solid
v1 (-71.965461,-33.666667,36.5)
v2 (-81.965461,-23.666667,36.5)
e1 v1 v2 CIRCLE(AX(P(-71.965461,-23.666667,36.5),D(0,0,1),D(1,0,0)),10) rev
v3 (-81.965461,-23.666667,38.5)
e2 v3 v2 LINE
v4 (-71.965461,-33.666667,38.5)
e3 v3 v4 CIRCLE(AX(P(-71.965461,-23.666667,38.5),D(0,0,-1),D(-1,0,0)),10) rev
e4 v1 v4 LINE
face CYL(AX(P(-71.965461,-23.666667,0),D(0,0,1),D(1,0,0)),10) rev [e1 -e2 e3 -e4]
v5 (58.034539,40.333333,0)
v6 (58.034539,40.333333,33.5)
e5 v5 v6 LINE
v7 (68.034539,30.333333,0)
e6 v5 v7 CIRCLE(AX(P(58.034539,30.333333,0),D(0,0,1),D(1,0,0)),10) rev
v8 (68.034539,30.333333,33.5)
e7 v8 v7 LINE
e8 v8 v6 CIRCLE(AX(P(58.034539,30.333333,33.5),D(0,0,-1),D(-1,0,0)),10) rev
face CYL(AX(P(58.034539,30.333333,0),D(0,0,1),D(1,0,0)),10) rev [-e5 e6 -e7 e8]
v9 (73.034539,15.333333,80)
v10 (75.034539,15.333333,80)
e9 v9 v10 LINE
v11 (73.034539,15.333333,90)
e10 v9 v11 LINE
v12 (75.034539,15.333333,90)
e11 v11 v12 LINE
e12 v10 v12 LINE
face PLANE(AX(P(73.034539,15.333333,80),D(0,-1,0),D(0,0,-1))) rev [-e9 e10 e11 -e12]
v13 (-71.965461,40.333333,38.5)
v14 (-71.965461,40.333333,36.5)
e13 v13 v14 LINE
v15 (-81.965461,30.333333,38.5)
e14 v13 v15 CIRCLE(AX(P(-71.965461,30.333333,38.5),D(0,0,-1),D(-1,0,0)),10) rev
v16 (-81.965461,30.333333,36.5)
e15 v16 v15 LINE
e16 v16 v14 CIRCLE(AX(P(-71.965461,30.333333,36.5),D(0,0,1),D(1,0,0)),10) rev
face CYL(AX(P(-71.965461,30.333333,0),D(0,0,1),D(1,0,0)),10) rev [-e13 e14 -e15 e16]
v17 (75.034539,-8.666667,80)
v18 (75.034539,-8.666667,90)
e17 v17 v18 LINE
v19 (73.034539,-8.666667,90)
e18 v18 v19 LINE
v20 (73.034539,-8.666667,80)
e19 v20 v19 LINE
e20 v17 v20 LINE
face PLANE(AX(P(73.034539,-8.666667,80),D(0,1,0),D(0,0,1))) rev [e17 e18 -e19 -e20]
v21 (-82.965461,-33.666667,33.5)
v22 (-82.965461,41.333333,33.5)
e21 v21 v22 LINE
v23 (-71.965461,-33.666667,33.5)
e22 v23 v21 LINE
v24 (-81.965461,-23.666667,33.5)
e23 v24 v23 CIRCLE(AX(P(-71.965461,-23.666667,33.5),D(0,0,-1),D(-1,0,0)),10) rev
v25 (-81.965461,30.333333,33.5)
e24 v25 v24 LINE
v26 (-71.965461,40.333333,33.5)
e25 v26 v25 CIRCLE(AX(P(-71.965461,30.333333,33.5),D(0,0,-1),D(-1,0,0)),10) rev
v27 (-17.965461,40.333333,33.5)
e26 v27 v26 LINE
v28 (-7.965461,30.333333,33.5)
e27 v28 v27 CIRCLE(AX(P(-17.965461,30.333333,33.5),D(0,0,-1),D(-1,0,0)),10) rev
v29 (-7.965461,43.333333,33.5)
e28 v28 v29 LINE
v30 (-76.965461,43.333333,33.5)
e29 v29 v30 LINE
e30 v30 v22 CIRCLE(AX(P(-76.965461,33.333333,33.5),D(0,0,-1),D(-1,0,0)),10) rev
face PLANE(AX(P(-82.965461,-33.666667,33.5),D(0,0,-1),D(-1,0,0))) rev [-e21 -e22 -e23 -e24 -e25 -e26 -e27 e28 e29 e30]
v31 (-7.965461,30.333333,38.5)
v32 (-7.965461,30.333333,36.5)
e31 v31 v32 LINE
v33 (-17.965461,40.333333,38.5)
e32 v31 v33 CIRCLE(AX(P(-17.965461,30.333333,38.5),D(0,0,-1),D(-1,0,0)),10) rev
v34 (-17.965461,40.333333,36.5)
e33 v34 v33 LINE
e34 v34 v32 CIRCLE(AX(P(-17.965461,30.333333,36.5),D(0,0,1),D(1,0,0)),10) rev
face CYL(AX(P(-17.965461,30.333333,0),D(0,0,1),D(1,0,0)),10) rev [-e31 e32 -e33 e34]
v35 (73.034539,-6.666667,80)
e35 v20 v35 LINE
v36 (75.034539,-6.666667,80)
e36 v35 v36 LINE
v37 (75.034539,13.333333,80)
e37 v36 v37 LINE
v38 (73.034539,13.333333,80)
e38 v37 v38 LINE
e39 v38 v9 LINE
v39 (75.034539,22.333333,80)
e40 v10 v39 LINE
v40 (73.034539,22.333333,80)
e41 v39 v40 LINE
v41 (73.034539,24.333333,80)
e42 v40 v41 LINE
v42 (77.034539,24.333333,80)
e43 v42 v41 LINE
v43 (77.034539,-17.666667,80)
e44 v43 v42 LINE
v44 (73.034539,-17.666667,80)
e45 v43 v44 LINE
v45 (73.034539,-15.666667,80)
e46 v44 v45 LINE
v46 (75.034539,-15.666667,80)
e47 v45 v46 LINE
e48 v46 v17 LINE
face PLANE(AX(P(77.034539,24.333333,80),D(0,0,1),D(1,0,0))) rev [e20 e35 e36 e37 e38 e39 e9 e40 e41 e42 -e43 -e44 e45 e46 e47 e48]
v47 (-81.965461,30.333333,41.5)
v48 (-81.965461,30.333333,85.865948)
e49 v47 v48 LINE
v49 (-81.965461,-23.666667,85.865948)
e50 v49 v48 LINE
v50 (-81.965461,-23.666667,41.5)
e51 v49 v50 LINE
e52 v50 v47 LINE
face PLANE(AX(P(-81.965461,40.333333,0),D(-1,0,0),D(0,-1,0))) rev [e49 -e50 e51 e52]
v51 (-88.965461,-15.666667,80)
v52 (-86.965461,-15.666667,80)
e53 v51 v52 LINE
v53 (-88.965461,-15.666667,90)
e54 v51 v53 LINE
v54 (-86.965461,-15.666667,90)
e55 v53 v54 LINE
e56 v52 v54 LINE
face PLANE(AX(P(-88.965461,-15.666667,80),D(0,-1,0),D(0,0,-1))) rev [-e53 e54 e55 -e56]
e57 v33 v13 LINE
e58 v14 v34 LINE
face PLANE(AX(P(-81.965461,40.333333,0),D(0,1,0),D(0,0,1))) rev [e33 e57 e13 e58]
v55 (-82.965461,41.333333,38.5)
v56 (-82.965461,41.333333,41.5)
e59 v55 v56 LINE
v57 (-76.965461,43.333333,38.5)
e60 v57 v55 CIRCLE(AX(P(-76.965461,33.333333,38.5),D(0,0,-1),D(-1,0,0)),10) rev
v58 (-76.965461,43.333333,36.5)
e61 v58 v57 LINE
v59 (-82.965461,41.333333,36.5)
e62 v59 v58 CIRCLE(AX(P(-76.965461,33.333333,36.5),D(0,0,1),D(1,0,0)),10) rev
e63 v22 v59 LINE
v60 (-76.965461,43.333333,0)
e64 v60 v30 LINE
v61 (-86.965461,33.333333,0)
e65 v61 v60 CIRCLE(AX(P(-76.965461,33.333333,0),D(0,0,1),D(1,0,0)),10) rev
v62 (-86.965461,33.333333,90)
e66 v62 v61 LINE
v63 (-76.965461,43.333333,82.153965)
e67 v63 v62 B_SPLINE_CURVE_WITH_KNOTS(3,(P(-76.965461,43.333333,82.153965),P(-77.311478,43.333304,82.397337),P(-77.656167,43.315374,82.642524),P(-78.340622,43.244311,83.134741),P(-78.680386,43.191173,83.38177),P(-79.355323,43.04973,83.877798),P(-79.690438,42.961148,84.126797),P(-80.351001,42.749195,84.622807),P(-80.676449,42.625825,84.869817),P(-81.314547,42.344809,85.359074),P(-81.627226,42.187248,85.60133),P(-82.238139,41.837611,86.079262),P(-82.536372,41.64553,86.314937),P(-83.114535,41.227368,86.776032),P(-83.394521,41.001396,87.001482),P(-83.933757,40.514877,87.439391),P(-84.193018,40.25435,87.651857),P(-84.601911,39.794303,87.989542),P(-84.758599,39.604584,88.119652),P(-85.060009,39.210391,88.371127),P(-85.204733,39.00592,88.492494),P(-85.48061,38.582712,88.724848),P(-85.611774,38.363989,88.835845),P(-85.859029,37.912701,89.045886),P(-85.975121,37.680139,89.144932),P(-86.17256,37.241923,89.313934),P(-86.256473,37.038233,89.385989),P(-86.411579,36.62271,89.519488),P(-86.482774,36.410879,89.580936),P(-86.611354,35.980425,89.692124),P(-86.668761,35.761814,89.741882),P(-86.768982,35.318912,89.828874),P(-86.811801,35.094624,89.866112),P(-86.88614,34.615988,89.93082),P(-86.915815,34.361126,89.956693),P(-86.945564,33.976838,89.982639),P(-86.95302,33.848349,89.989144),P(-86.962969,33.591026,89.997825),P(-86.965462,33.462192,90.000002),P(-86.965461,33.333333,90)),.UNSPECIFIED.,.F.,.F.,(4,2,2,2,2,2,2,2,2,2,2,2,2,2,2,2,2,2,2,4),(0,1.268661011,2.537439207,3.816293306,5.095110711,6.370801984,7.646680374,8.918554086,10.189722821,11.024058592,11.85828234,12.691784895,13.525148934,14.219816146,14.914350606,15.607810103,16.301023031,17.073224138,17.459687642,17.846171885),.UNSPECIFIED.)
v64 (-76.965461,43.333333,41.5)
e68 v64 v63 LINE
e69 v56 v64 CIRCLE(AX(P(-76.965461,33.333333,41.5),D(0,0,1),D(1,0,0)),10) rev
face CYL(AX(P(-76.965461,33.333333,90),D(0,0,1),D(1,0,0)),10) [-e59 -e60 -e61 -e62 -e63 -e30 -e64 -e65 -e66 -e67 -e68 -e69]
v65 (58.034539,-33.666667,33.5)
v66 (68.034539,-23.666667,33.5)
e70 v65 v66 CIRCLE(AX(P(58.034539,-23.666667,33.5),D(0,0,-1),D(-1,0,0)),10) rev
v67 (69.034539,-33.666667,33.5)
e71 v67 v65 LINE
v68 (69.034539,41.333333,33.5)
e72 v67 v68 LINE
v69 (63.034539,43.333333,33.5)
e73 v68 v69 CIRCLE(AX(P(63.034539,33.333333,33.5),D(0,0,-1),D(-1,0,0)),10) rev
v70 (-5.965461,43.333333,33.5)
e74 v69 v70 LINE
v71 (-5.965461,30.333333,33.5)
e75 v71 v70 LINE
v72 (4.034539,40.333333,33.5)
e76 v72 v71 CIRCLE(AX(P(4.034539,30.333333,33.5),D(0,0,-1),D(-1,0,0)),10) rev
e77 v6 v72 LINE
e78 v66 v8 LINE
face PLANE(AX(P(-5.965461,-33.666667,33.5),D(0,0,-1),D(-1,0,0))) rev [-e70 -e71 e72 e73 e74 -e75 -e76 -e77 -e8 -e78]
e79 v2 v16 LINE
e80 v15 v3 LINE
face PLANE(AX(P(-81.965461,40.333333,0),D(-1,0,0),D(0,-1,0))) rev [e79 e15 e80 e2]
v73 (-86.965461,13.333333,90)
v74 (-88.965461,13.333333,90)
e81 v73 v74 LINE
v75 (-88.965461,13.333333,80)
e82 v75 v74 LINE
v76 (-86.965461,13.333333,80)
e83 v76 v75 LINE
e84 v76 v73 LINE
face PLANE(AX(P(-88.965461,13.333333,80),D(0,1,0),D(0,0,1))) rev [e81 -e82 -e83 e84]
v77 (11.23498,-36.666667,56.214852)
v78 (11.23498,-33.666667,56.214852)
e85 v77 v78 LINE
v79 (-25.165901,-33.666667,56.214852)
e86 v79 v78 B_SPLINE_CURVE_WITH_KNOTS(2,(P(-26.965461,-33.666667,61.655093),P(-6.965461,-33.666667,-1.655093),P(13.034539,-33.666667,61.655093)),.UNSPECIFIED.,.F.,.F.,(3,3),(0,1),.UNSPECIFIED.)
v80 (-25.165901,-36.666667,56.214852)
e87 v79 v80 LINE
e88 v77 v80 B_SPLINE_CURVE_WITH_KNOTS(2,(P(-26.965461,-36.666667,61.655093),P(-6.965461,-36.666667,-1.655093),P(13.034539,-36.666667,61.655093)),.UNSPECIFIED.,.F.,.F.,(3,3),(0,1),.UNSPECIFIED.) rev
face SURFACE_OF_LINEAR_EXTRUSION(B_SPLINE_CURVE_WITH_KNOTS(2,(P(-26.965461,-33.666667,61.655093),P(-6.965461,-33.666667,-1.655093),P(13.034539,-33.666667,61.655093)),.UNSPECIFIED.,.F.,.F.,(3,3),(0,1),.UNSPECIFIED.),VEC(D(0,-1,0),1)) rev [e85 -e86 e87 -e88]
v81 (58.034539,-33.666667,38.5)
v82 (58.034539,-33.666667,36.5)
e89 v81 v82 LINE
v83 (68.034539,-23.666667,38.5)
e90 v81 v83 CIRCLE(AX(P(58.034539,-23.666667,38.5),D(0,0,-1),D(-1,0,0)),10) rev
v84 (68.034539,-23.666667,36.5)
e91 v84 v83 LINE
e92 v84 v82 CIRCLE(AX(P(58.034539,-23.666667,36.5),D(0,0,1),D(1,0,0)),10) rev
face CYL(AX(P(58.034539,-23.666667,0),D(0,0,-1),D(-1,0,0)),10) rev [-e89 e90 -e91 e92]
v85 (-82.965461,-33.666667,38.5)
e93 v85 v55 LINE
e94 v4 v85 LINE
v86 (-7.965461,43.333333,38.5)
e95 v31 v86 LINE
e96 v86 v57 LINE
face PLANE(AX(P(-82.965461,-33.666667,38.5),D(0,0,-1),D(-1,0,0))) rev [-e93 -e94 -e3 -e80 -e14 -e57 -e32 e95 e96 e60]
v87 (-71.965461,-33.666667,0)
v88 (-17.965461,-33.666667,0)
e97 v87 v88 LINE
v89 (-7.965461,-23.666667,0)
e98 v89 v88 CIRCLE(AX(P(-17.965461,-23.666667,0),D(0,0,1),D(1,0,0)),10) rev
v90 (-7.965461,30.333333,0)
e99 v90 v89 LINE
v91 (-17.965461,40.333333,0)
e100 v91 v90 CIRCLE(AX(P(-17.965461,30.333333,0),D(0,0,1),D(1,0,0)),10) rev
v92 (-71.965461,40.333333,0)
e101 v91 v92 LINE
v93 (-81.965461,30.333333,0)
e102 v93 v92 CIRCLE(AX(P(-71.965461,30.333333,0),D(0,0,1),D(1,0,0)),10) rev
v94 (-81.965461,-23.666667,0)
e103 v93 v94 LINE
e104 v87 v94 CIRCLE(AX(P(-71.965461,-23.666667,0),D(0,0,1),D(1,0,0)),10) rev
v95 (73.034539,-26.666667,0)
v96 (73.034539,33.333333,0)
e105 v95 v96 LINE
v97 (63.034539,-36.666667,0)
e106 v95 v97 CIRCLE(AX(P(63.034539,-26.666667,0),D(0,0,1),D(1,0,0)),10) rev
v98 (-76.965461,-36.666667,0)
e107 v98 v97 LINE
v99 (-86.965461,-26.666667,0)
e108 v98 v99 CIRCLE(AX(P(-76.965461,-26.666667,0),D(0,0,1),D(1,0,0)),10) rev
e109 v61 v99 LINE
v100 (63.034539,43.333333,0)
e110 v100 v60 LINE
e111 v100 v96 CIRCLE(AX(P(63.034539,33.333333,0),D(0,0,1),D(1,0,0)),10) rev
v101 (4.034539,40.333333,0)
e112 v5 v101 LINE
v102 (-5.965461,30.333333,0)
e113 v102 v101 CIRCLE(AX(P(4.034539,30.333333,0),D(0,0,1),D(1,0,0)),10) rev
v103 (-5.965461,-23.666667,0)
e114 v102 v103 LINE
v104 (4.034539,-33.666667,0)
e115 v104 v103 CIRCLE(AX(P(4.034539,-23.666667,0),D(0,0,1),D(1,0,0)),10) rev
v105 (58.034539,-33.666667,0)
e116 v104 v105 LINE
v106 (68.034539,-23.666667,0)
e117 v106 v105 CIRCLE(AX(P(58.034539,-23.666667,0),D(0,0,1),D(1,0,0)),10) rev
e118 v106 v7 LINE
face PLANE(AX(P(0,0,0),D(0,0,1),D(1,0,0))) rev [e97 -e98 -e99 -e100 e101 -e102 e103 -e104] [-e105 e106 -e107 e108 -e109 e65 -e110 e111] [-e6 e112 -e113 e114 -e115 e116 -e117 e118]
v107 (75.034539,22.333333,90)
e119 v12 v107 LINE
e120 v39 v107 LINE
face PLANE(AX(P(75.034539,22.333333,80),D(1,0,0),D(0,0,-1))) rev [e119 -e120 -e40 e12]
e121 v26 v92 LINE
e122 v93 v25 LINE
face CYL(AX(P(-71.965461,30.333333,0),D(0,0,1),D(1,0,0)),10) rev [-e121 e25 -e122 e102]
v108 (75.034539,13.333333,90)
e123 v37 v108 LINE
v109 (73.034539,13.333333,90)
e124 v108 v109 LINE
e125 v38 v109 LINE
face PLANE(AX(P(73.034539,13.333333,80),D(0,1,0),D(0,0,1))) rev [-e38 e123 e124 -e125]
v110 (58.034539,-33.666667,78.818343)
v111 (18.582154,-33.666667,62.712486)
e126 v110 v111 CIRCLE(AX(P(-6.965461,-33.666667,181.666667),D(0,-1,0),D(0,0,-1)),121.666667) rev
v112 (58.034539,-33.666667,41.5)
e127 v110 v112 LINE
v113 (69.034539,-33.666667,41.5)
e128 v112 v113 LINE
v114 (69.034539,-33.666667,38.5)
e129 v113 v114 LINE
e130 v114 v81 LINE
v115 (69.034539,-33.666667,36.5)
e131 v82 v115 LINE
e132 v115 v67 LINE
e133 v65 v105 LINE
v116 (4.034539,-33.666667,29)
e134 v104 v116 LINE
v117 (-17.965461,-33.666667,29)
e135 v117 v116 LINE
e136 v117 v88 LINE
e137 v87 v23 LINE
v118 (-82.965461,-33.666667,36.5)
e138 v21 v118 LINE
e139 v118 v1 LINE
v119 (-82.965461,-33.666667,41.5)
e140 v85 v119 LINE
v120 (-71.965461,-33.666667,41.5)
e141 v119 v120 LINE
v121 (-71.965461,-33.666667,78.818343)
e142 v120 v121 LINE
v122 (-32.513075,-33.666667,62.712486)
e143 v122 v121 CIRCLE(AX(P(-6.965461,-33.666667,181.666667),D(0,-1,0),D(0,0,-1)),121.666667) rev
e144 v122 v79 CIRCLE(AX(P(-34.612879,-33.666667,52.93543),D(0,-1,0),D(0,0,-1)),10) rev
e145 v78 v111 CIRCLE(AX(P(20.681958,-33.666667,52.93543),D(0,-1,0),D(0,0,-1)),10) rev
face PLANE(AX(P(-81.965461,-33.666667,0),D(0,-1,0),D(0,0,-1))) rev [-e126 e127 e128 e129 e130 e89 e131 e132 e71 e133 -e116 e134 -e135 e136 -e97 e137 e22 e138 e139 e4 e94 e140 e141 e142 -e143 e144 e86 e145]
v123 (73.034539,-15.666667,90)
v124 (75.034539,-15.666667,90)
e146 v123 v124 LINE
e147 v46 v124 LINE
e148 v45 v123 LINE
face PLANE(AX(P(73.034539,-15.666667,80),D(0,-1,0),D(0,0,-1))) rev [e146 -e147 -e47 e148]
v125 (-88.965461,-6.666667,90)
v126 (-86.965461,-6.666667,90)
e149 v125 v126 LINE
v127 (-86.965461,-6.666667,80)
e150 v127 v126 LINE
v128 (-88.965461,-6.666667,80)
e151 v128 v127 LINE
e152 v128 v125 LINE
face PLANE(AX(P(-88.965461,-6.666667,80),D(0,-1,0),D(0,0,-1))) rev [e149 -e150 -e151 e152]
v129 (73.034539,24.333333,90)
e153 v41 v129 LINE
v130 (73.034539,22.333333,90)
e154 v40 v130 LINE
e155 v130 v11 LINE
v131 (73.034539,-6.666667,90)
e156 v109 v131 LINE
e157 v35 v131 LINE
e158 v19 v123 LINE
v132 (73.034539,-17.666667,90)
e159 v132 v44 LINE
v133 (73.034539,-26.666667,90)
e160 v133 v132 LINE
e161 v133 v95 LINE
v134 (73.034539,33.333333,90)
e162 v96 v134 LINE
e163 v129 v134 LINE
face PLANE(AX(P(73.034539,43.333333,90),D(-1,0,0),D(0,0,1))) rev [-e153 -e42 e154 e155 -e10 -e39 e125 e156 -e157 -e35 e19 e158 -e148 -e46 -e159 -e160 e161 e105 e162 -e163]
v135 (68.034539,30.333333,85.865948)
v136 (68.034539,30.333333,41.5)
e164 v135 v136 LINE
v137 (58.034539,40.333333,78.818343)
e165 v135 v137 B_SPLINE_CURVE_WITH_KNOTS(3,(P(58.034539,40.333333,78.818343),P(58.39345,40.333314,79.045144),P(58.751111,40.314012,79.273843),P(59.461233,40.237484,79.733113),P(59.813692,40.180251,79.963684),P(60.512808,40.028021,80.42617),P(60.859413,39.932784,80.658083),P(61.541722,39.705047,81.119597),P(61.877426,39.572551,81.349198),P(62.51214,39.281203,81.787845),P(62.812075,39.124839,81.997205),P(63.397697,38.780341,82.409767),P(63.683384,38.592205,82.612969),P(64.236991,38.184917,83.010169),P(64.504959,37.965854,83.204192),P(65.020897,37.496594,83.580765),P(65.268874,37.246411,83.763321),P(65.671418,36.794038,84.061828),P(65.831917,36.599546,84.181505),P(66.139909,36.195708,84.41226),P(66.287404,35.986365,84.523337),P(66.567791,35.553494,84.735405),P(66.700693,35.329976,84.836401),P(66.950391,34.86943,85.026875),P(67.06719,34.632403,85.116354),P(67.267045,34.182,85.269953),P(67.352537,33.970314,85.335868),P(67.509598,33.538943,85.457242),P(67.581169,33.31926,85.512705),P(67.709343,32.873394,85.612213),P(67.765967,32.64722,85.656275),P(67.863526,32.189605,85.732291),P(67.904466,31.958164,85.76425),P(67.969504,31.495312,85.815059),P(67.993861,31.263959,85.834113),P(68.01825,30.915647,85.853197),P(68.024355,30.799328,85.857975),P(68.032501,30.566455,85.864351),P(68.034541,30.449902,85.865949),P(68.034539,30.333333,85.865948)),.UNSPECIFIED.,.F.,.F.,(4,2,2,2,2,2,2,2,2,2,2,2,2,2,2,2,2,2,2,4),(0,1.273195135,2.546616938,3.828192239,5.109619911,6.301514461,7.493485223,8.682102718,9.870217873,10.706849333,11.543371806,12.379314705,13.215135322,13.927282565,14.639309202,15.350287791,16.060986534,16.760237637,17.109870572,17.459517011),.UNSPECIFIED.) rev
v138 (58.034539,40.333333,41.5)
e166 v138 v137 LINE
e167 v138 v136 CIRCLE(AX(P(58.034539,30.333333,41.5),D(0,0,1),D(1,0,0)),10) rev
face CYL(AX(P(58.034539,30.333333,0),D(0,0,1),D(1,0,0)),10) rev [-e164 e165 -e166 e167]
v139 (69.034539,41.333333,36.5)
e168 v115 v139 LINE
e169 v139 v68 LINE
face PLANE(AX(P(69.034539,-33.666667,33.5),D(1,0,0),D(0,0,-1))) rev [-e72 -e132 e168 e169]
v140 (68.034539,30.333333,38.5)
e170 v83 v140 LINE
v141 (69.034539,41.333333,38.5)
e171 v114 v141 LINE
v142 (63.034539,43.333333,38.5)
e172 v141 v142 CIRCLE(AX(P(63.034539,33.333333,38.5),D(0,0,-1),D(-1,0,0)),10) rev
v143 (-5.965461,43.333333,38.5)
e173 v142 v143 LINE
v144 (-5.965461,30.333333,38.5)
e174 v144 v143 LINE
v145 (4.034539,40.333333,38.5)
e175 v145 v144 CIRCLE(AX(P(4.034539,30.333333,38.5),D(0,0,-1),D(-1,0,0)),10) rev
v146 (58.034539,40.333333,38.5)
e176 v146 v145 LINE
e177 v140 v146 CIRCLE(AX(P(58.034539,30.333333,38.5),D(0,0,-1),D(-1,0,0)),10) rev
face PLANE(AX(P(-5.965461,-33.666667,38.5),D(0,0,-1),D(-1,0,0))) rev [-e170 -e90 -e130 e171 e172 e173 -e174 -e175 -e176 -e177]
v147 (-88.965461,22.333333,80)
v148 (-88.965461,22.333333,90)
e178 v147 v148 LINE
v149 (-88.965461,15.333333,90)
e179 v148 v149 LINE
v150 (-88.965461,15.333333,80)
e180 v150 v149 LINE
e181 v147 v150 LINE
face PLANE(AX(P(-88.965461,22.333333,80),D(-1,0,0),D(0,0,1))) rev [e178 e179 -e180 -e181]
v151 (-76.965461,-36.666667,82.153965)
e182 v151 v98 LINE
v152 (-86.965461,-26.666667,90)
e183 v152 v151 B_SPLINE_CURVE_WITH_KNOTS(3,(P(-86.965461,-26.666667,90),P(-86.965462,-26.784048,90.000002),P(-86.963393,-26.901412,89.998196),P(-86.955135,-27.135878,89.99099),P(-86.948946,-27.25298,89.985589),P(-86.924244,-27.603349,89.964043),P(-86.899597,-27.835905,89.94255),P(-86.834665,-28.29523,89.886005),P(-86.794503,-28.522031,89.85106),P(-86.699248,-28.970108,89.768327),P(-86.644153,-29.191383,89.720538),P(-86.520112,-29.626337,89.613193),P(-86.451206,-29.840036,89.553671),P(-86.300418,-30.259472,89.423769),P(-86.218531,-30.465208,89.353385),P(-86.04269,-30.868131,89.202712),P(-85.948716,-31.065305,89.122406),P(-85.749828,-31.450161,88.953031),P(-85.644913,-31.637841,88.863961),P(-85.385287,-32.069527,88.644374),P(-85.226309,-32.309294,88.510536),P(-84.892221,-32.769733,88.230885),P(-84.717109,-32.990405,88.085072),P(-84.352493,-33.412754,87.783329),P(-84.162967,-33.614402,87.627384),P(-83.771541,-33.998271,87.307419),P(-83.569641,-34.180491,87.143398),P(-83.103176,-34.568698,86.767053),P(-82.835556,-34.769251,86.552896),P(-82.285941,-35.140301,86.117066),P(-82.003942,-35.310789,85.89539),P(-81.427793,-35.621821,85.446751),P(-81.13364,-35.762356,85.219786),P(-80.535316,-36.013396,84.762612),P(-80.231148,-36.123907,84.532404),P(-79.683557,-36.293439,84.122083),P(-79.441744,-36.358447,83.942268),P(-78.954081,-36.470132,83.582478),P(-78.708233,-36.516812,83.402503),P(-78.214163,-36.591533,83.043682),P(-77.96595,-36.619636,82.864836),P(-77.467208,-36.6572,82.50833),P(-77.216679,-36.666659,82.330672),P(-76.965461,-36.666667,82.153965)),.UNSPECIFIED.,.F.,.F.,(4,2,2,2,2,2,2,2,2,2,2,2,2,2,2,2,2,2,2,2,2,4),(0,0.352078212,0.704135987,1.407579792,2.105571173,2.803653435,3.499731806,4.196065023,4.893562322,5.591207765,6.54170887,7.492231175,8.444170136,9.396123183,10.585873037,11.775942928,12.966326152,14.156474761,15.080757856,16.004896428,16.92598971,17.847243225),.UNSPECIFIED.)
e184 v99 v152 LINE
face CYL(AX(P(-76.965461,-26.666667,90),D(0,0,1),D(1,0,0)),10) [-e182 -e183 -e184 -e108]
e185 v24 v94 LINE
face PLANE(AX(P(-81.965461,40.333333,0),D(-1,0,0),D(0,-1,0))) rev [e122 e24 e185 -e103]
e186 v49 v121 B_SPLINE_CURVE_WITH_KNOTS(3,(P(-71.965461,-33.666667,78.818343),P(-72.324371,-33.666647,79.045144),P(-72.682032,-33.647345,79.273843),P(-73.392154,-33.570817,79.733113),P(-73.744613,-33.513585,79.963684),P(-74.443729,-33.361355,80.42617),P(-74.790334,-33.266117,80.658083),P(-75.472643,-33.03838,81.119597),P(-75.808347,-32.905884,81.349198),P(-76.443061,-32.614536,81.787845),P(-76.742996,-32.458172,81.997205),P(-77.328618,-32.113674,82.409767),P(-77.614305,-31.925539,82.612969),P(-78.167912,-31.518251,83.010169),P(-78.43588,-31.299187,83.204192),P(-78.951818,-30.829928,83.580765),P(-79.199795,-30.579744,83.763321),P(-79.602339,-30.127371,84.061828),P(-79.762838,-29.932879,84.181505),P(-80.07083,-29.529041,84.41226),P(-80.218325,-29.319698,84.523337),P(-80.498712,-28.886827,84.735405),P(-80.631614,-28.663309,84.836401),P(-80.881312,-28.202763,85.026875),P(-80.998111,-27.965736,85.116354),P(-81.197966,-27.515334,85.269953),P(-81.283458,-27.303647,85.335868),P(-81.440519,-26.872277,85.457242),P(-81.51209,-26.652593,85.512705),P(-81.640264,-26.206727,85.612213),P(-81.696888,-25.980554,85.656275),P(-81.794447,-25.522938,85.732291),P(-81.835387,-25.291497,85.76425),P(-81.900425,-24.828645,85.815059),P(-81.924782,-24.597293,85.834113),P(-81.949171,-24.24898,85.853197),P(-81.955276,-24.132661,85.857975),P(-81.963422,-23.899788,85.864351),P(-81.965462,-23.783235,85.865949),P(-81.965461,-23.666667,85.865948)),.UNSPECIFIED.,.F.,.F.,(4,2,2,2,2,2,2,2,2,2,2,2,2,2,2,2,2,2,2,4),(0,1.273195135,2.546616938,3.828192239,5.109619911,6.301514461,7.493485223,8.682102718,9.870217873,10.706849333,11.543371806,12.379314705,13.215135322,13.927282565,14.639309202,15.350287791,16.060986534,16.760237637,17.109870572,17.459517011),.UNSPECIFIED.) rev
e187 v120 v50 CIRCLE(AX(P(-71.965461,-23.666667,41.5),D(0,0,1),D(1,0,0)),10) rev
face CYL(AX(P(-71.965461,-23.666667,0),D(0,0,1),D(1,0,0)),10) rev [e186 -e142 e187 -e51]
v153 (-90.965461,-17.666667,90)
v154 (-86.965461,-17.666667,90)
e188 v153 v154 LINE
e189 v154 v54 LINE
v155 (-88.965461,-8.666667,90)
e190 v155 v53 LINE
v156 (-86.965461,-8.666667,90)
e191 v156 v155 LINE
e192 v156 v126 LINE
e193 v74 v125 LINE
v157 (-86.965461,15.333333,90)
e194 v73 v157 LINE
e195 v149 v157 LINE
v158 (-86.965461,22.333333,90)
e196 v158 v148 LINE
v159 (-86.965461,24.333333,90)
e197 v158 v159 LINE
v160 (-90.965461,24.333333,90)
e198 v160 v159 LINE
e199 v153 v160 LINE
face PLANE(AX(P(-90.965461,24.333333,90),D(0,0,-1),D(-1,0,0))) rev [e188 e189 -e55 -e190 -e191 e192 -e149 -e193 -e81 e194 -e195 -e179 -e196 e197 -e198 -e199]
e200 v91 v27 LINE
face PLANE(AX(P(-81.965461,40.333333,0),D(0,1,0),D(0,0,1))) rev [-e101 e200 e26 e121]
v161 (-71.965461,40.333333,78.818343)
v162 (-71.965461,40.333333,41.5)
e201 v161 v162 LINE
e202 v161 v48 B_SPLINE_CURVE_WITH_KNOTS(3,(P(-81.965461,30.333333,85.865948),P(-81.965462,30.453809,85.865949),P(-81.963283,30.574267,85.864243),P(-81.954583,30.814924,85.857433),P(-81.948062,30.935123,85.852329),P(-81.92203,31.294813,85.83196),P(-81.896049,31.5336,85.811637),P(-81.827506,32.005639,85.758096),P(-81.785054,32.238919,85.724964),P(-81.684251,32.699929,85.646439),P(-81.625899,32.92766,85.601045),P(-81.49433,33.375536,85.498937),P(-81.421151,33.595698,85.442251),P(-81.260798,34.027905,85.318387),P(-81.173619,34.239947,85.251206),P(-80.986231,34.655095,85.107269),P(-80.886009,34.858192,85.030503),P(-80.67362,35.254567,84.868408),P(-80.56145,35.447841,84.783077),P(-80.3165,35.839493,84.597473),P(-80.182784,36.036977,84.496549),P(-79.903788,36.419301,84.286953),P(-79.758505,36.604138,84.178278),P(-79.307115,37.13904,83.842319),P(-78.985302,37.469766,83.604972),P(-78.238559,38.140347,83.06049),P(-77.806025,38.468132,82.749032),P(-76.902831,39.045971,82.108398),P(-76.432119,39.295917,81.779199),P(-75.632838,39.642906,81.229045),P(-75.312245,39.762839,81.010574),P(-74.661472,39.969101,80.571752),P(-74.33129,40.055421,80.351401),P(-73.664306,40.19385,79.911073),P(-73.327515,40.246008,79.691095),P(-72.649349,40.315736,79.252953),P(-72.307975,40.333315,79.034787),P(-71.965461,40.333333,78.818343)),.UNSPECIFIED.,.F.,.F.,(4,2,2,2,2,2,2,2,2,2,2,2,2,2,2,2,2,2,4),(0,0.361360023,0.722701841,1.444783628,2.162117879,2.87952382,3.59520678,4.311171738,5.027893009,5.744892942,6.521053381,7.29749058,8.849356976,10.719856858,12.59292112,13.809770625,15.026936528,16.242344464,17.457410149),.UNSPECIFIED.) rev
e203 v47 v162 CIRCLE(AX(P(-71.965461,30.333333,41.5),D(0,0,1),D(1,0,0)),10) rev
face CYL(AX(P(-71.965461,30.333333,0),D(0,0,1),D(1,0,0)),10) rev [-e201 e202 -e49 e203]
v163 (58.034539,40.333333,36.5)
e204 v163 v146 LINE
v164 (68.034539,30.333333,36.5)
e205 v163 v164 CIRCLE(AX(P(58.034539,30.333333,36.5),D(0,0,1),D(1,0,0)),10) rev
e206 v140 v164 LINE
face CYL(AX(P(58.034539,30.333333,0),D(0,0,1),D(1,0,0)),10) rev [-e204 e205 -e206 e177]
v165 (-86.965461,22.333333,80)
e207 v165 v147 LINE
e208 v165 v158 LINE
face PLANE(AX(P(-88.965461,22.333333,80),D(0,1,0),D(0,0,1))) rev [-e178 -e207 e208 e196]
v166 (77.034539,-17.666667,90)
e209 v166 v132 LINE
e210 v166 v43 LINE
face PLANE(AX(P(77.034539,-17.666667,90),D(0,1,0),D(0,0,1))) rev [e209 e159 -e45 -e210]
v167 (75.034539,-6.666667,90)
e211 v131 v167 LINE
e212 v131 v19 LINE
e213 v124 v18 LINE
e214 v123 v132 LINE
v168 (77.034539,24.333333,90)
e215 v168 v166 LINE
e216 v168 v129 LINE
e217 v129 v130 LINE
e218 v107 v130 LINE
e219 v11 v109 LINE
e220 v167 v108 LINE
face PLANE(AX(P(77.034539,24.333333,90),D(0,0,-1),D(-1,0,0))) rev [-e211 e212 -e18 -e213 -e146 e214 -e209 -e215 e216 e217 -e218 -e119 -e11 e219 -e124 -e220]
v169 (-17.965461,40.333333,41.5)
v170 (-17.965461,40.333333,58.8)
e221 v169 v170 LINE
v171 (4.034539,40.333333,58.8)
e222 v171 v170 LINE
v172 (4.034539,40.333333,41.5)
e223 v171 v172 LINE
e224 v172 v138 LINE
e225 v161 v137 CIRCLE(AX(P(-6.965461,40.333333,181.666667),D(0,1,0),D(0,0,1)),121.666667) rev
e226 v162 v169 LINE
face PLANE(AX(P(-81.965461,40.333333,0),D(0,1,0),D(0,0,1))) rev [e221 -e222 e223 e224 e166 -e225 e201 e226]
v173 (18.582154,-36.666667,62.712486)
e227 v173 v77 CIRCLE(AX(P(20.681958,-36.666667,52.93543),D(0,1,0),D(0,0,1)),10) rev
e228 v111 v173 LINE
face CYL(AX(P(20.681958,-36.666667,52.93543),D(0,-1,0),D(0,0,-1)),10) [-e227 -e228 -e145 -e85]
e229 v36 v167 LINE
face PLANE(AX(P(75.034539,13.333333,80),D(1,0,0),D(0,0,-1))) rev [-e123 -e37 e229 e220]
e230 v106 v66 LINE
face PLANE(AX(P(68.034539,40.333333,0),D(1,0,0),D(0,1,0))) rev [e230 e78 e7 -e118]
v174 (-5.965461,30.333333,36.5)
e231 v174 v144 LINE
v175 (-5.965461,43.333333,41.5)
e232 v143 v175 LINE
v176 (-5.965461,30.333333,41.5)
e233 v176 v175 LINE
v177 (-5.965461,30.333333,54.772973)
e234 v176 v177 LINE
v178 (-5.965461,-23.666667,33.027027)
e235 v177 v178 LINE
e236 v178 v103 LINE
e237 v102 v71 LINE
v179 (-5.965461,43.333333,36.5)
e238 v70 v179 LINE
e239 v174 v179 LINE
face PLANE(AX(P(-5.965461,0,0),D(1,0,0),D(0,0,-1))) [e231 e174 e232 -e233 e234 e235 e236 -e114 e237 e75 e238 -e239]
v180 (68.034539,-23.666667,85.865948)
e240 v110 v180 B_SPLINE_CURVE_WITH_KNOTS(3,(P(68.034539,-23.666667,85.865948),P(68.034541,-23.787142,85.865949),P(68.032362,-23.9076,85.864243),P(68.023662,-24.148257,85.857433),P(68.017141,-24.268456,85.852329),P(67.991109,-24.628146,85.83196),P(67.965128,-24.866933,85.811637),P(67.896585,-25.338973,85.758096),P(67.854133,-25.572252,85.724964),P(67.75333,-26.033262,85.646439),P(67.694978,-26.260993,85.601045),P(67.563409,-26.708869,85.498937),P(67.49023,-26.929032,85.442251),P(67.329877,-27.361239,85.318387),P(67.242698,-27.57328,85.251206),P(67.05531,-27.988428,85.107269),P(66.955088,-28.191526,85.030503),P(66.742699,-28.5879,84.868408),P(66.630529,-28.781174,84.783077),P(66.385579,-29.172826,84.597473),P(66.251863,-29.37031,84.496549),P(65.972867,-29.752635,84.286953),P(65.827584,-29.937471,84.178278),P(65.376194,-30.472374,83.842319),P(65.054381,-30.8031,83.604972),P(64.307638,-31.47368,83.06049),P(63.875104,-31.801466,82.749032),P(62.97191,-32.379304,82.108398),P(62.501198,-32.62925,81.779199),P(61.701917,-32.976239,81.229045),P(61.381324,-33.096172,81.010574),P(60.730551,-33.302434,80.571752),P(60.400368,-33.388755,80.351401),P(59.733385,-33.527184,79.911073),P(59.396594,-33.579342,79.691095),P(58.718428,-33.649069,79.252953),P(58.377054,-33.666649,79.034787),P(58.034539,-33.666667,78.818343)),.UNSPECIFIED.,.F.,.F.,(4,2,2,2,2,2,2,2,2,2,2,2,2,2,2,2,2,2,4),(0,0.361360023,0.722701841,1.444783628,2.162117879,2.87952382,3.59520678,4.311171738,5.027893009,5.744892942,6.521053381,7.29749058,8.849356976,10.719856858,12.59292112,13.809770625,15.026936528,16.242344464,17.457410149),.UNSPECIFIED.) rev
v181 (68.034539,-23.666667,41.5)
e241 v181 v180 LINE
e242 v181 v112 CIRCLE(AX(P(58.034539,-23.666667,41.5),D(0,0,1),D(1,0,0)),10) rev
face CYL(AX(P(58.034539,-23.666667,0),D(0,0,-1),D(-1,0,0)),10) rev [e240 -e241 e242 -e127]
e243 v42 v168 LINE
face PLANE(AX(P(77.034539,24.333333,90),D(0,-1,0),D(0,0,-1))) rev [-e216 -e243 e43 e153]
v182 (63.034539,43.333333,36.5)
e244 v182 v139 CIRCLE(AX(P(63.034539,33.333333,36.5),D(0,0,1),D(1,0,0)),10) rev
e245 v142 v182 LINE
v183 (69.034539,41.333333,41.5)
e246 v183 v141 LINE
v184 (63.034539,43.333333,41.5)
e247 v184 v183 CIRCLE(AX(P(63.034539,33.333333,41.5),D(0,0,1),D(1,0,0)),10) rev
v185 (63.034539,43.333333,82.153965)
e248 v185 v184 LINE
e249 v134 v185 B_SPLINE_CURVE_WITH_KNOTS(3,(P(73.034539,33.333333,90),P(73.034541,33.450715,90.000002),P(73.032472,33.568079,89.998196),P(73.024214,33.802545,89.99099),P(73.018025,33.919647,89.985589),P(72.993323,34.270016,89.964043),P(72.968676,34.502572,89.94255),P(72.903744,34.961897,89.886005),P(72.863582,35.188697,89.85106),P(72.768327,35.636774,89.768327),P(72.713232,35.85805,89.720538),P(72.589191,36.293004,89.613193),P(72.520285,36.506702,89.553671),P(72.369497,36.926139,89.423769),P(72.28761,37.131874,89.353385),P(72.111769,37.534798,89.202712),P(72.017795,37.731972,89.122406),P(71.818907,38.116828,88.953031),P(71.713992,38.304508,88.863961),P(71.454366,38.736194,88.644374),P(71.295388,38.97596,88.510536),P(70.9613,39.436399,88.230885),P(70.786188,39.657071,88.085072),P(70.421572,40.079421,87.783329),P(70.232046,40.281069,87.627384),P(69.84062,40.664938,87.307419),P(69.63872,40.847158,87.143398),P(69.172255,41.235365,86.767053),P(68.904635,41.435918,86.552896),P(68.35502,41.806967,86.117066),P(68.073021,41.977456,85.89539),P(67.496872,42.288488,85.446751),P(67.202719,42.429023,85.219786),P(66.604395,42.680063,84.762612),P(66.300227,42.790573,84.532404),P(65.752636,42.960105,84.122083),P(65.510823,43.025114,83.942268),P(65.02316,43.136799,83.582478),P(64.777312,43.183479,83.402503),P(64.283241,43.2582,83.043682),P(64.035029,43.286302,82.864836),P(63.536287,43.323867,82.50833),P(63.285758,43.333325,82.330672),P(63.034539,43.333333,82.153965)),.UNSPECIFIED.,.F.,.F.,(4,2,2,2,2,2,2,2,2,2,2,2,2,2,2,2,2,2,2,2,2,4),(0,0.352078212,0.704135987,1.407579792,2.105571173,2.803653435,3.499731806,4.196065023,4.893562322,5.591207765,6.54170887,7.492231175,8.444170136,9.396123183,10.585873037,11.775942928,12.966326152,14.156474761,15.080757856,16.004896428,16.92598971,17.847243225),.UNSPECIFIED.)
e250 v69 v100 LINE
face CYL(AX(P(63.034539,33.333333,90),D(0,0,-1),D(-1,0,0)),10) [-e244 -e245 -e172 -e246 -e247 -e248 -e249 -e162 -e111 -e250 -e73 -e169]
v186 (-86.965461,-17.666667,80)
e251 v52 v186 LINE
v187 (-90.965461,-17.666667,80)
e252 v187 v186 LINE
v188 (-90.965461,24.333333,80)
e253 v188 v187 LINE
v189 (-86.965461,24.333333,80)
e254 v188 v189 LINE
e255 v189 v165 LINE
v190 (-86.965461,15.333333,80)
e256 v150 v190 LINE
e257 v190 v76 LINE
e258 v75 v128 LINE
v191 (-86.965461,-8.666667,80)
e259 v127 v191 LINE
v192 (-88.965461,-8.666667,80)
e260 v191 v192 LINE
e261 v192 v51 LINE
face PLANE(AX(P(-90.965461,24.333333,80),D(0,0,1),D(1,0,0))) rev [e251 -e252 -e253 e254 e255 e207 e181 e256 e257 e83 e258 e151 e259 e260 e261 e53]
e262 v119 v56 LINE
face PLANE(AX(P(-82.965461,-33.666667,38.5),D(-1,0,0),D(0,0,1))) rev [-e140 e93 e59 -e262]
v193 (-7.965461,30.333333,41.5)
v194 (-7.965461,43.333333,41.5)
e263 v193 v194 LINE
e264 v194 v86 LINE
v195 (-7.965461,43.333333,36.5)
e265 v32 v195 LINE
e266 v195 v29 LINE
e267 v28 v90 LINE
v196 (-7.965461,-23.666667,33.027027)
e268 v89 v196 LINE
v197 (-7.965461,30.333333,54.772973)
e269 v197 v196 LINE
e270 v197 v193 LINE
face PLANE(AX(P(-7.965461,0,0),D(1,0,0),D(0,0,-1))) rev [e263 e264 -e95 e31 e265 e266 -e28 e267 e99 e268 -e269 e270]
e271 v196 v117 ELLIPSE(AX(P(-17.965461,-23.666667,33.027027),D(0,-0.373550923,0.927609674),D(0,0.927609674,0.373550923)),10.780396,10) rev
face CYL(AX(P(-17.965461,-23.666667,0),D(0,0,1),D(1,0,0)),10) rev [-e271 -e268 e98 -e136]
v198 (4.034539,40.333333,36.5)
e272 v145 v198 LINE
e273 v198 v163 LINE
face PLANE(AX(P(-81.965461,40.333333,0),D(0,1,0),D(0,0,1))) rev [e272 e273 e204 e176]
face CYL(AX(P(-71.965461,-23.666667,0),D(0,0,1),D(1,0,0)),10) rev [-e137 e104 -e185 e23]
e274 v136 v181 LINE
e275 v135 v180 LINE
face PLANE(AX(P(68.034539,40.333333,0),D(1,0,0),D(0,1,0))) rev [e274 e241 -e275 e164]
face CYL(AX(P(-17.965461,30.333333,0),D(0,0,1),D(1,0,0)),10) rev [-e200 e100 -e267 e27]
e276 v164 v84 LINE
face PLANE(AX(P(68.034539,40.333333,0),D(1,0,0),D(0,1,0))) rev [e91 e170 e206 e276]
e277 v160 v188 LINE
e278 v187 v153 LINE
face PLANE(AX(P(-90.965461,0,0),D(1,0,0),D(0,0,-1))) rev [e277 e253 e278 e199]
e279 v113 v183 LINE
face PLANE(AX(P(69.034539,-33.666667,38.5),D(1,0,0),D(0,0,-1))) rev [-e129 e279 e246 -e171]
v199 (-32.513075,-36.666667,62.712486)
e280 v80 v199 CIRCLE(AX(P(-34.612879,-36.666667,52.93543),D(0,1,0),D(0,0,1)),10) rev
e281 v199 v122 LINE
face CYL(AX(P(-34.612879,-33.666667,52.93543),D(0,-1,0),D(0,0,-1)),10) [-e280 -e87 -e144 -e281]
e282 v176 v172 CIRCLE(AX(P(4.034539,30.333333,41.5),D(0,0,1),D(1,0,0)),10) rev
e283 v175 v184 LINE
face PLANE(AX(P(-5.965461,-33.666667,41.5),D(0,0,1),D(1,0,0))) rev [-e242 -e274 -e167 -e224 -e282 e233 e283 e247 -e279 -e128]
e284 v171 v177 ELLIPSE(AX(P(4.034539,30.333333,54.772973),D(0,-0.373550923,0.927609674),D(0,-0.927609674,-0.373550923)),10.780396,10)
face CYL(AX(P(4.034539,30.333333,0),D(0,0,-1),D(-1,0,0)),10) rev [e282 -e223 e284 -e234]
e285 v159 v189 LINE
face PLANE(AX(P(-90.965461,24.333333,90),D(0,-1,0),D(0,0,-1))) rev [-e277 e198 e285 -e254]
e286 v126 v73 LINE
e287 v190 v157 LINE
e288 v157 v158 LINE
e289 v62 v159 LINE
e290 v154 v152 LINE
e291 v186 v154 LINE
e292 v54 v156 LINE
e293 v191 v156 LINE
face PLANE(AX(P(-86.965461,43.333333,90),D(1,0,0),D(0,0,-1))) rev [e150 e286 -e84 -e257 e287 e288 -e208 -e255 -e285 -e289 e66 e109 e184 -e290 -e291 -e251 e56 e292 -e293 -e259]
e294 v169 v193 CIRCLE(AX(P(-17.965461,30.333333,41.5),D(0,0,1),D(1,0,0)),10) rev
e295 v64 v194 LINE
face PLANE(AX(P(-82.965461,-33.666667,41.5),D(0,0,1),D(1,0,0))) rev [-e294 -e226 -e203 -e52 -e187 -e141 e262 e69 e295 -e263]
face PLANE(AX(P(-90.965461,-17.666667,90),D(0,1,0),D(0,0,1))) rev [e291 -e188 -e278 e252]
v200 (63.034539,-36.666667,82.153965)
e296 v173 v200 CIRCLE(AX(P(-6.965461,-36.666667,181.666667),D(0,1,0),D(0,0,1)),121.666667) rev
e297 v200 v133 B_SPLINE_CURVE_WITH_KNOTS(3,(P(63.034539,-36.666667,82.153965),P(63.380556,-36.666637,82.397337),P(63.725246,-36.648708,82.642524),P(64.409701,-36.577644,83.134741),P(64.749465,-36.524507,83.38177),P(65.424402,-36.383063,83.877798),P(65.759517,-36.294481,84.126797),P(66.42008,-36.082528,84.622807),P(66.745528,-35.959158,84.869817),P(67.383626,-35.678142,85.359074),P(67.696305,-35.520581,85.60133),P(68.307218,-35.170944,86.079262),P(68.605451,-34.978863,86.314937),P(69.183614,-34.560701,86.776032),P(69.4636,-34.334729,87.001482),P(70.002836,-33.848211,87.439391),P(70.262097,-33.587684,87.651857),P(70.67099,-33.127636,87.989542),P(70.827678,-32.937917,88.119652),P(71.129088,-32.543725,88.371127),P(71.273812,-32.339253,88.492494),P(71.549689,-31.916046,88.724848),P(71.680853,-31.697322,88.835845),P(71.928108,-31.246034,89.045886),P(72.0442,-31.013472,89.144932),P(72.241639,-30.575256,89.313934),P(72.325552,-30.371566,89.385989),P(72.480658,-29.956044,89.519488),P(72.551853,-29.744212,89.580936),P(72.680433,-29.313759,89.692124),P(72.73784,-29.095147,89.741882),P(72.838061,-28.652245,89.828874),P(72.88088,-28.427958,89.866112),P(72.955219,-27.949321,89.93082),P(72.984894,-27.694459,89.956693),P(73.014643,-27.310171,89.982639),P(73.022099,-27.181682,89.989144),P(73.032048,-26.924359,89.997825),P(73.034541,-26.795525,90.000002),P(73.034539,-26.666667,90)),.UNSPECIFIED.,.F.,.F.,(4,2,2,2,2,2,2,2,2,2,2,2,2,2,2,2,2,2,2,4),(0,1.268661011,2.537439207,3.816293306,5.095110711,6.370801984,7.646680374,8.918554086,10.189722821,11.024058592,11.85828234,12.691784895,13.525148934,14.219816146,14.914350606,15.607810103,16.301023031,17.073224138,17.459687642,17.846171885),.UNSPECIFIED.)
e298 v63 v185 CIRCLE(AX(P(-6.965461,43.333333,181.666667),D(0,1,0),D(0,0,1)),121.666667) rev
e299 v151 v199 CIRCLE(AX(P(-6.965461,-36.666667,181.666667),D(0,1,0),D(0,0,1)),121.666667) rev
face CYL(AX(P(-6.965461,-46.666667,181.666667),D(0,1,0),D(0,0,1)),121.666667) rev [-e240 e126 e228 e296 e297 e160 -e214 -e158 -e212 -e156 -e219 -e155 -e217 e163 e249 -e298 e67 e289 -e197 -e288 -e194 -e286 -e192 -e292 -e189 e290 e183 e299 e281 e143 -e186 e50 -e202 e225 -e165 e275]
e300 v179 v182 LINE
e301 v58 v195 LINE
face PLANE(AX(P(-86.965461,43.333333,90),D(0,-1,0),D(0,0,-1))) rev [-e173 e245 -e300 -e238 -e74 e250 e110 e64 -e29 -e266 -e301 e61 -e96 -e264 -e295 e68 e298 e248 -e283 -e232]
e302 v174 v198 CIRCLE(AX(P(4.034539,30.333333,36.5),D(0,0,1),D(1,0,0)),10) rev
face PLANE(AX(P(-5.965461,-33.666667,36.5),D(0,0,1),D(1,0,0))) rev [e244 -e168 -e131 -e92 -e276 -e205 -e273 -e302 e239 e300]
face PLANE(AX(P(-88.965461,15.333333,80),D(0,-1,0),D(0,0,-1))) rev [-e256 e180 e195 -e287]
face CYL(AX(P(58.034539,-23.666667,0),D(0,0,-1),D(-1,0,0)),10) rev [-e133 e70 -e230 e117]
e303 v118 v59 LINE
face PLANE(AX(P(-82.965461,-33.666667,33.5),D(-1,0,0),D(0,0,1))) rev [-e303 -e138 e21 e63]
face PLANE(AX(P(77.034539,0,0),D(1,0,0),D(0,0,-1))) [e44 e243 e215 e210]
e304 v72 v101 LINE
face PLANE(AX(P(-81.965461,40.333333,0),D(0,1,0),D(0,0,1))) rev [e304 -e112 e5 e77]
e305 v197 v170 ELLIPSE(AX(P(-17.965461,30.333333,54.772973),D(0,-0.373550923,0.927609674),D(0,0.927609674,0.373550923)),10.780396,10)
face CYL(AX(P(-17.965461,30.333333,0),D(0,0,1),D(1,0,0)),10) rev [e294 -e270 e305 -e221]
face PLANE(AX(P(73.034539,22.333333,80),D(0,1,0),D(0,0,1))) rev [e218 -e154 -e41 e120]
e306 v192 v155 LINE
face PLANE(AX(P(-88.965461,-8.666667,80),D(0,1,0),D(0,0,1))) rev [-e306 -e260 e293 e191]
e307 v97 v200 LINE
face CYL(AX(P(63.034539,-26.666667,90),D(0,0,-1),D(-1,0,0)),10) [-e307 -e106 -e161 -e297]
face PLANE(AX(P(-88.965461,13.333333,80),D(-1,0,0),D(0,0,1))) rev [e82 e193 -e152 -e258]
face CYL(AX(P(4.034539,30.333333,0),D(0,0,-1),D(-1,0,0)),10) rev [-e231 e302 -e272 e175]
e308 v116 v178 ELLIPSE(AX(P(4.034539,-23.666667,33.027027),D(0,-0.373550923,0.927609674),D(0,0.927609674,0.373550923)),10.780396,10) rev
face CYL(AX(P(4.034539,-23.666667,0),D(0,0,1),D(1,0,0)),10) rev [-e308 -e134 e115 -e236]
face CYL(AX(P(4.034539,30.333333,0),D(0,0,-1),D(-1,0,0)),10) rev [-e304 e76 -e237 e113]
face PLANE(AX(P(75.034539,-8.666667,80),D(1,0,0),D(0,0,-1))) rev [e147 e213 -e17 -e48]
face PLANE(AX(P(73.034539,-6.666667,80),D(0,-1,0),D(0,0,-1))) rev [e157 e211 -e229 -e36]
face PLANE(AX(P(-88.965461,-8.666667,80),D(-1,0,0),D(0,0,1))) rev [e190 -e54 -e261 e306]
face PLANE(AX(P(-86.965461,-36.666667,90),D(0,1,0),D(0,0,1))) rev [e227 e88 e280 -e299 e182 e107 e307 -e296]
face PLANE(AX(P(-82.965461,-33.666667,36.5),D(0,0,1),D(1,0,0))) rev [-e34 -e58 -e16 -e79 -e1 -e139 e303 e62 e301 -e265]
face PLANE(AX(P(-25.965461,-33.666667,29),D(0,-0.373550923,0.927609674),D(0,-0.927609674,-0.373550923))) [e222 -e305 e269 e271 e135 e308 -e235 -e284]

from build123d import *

# Parameters (mm, degrees)
ESBO_O1_W                  = 160
ESBO_O1_H                  = 80
RESSALTO_EXTRUS_O1_DEPTH   = 90
ESBO_O2_W                  = 150
ESBO_O2_H                  = 74
CORTE_EXTRUS_O1_DEPTH      = 90
CORTE_EXTRUS_O2_DEPTH      = 90
CORTE_EXTRUS_O3_START      = -3
CORTE_EXTRUS_O3_DEPTH      = 152.536161673
FILETE1_R                  = 10
FILETE2_R                  = 10
RESSALTO_EXTRUS_O3_DEPTH   = 2
ESBO_O14_W                 = 40
ESBO_O14_H                 = 30
RESSALTO_EXTRUS_O10_DEPTH  = 2
FILETE15_R                 = 10
FILETE16_R                 = 10
CORTE_EXTRUS_O8_DEPTH      = 20
CORTE_EXTRUS_O8_DEPTH_BACK = 20
FILETE17_R                 = 10
FILETE18_R                 = 10
FILETE19_R                 = 10
FILETE20_R                 = 10
FILETE21_R                 = 10
FILETE22_R                 = 10
ESBO_O8_W                  = 75
ESBO_O8_H                  = 3
CORTE_EXTRUS_O9_DEPTH      = 77
FILETE24_R                 = 10
FILETE25_R                 = 10
FILETE26_R                 = 10
FILETE27_R                 = 10
ESBO_O9_W                  = 10
ESBO_O9_H                  = 42
RESSALTO_EXTRUS_O11_DEPTH  = 4
ESBO_O17_W                 = 2
ESBO_O17_H                 = 7
ESBO_O17_H_2               = 20
CORTE_EXTRUS_O10_DEPTH     = 10
ESBO_O18_W                 = 10
ESBO_O18_H                 = 42
RESSALTO_EXTRUS_O12_DEPTH  = 4
ESBO_O19_W                 = 2
ESBO_O19_H                 = 7
ESBO_O19_H_2               = 20
CORTE_EXTRUS_O11_DEPTH     = 10


with BuildPart() as part:
    # Esboço1 → Ressalto-extrusão1 (new body)
    with BuildSketch(Plane.XY):
        with Locations((-6.965460526, 3.333333333)):
            Rectangle(ESBO_O1_W, ESBO_O1_H)
    extrude(amount=RESSALTO_EXTRUS_O1_DEPTH)

    # Esboço2 → Corte-extrusão1 (cut)
    with BuildSketch(Plane.XY.offset(90)):
        with Locations((-6.965460526, 3.333333333)):
            Rectangle(ESBO_O2_W, ESBO_O2_H)
    extrude(amount=-CORTE_EXTRUS_O1_DEPTH, mode=Mode.SUBTRACT)

    # Esboço3 → Corte-extrusão2 (cut)
    with BuildSketch(Plane(origin=(0, 43.333333333, 0), x_dir=(1, 0, 0), z_dir=(0, 1, 0))):
        with BuildLine():
            ThreePointArc((-6.965460526, -60), (-49.685479253, -67.746616729), (-86.965460526, -90))
            Line((-86.965460526, -90), (-6.965460526, -90))
            Line((-6.965460526, -90), (-6.965460526, -60))
        make_face()
        with BuildLine():
            Line((-6.965460526, -60), (-6.965460526, -90))
            Line((-6.965460526, -90), (73.034539474, -90))
            ThreePointArc((73.034539474, -90), (35.7545582, -67.746616729), (-6.965460526, -60))
        make_face()
    extrude(amount=-CORTE_EXTRUS_O2_DEPTH, mode=Mode.SUBTRACT)

    # Esboço5 → Corte-extrusão3 (cut, through all)
    with BuildSketch(Plane.XZ.offset(36.666666667).offset(CORTE_EXTRUS_O3_START)):
        with BuildLine():
            ThreePointArc((13.034539474, 61.655093151), (-6.965460526, 60), (-26.965460526, 61.655093151))
            add(Edge.make_bspline(
                [(-26.965460526, 61.655093151), (-6.965460526, -1.655093151), (13.034539474, 61.655093151)],
                knots=[0, 0, 0, 1, 1, 1], degree=2))
        make_face()
    extrude(amount=CORTE_EXTRUS_O3_DEPTH, mode=Mode.SUBTRACT)

    # Filete1
    filete1_edges = [part.edges().sort_by_distance(p)[0] for p in [
        (-26.965460526, -35.166666667, 61.655093151),
    ]]
    fillet(filete1_edges, radius=FILETE1_R)

    # Filete2
    filete2_edges = [part.edges().sort_by_distance(p)[0] for p in [
        (13.034539474, -35.166666667, 61.655093151),
    ]]
    fillet(filete2_edges, radius=FILETE2_R)

    # Esboço7 → Ressalto-extrusão3 (add)
    with BuildSketch(Plane.ZY.offset(5.965460526)):
        Polygon((60, 43.333333333), (0, 43.333333333), (0, -36.666666667), (28, -36.666666667), align=None)
    extrude(amount=RESSALTO_EXTRUS_O3_DEPTH)

    # Esboço14 → Ressalto-extrusão10 (add)
    with BuildSketch(Plane.ZY.offset(5.965460526)):
        with Locations((20, -18.666666667)):
            Rectangle(ESBO_O14_W, ESBO_O14_H)
    extrude(amount=RESSALTO_EXTRUS_O10_DEPTH)

    # Filete15
    # the kernel refuses this fillet: 10 mm, written as the material it adds along each edge
    with BuildSketch(Plane(origin=(-5.965460526, -33.666666667, 0), x_dir=(0, 1, 0), z_dir=(0, 0, 1))) as filete15_piece_1_section:
        with BuildLine():
            CenterArc((FILETE15_R, -FILETE15_R), FILETE15_R, 90, 90)
            Line((0, -FILETE15_R), (0, 0))
            Line((0, 0), (FILETE15_R, 0))
        make_face()
    filete15_piece_1 = extrude(amount=55.079137733, mode=Mode.PRIVATE)
    filete15_piece_1 = split(filete15_piece_1, bisect_by=Plane(origin=(-3.65687296, -31.473045743, 40), z_dir=(0, 0, -1)), keep=Keep.TOP, mode=Mode.PRIVATE)
    add(filete15_piece_1)

    # Filete16
    # the kernel refuses this fillet: 10 mm, written as the material it adds along each edge
    with BuildSketch(Plane(origin=(-7.965460526, -33.666666667, 55.079137733), x_dir=(-1, 0, 0), z_dir=(0, 0, -1))) as filete16_piece_1_section:
        with BuildLine():
            CenterArc((FILETE16_R, FILETE16_R), FILETE16_R, 180, 90)
            Line((0, FILETE16_R), (0, 0))
            Line((0, 0), (FILETE16_R, 0))
        make_face()
    filete16_piece_1 = extrude(amount=55.079137733, mode=Mode.PRIVATE)
    filete16_piece_1 = split(filete16_piece_1, bisect_by=Plane(origin=(-9.937156606, -31.292891496, 40), z_dir=(0, 0, -1)), keep=Keep.TOP, mode=Mode.PRIVATE)
    add(filete16_piece_1)

    # Esboço16 → Corte-extrusão8 (cut, two sides: drawn at the far end of the back side and taken through both)
    with BuildSketch(Plane.ZY.offset(5.965460526).offset(-CORTE_EXTRUS_O8_DEPTH_BACK)):
        Polygon((29, -33.666666667), (58.8, 40.333333333), (60, -33.666666667), align=None)
    extrude(amount=CORTE_EXTRUS_O8_DEPTH + CORTE_EXTRUS_O8_DEPTH_BACK, mode=Mode.SUBTRACT)

    # Filete17
    filete17_edges = [part.edges().sort_by_distance(p)[0] for p in [
        (-81.965460526, 40.333333333, 42.932973789),
    ]]
    fillet(filete17_edges, radius=FILETE17_R)

    # Filete18
    # the kernel refuses this fillet: 10 mm, written as the material it adds along each edge
    with BuildSketch(Plane(origin=(-5.965460526, 40.333333333, 83.8), x_dir=(1, 0, 0), z_dir=(0, 0, -1))) as filete18_piece_1_section:
        with BuildLine():
            CenterArc((FILETE18_R, FILETE18_R), FILETE18_R, 180, 90)
            Line((0, FILETE18_R), (0, 0))
            Line((0, 0), (FILETE18_R, 0))
        make_face()
    filete18_piece_1 = extrude(amount=83.8, mode=Mode.PRIVATE)
    filete18_piece_1 = split(filete18_piece_1, bisect_by=Plane(origin=(-3.682408993, 28.070036468, 53.861537208), z_dir=(0, 0.37355092292184666, -0.927609674369687)), keep=Keep.TOP, mode=Mode.PRIVATE)
    add(filete18_piece_1)

    # Filete19
    filete19_edges = [part.edges().sort_by_distance(p)[0] for p in [
        (68.034539474, 40.333333333, 42.932973789),
    ]]
    fillet(filete19_edges, radius=FILETE19_R)

    # Filete20
    # the kernel refuses this fillet: 10 mm, written as the material it adds along each edge
    with BuildSketch(Plane(origin=(-7.965460526, 40.333333333, 83.8), x_dir=(-1, 0, 0), z_dir=(0, 0, -1))) as filete20_piece_1_section:
        with BuildLine():
            CenterArc((FILETE20_R, -FILETE20_R), FILETE20_R, 90, 90)
            Line((0, -FILETE20_R), (0, 0))
            Line((0, 0), (FILETE20_R, 0))
        make_face()
    filete20_piece_1 = extrude(amount=83.8, mode=Mode.PRIVATE)
    filete20_piece_1 = split(filete20_piece_1, bisect_by=Plane(origin=(-10.248512059, 28.070036468, 53.861537208), z_dir=(0, 0.37355092292187014, -0.9276096743696776)), keep=Keep.TOP, mode=Mode.PRIVATE)
    add(filete20_piece_1)

    # Filete21
    filete21_edges = [part.edges().sort_by_distance(p)[0] for p in [
        (68.034539474, -33.666666667, 42.932973789),
    ]]
    fillet(filete21_edges, radius=FILETE21_R)

    # Filete22
    filete22_edges = [part.edges().sort_by_distance(p)[0] for p in [
        (-81.965460526, -33.666666667, 42.932973789),
    ]]
    fillet(filete22_edges, radius=FILETE22_R)

    # Esboço8 → Corte-extrusão9 (cut)
    with BuildSketch(Plane(origin=(0, 43.333333333, 0), x_dir=(1, 0, 0), z_dir=(0, 1, 0))):
        with Locations((-45.465460526, -35)):
            Rectangle(ESBO_O8_W, ESBO_O8_H)
        with Locations((31.534539474, -35)):
            Rectangle(ESBO_O8_W, ESBO_O8_H)
        with Locations((-45.465460526, -40)):
            Rectangle(ESBO_O8_W, ESBO_O8_H)
        with Locations((31.534539474, -40)):
            Rectangle(ESBO_O8_W, ESBO_O8_H)
    extrude(amount=-CORTE_EXTRUS_O9_DEPTH, mode=Mode.SUBTRACT)

    # Filete24
    filete24_edges = [part.edges().sort_by_distance(p)[0] for p in [
        (73.034539474, -36.666666667, 45),
    ]]
    fillet(filete24_edges, radius=FILETE24_R)

    # Filete25
    filete25_edges = [part.edges().sort_by_distance(p)[0] for p in [
        (-86.965460526, -36.666666667, 45),
    ]]
    fillet(filete25_edges, radius=FILETE25_R)

    # Filete26
    # the kernel refuses this fillet: 10 mm, written as the material it takes off along each edge
    with BuildSketch(Plane(origin=(-86.965460526, 43.333333333, -25), x_dir=(0, -1, 0), z_dir=(0, 0, 1))) as filete26_piece_1:
        with BuildLine():
            CenterArc((FILETE26_R, FILETE26_R), FILETE26_R, 180, 90)
            Line((0, FILETE26_R), (0, 0))
            Line((0, 0), (FILETE26_R, 0))
        make_face()
    extrude(amount=140, mode=Mode.SUBTRACT)

    # Filete27
    # the kernel refuses this fillet: 10 mm, written as the material it takes off along each edge
    with BuildSketch(Plane(origin=(73.034539474, 43.333333333, -25), x_dir=(-1, 0, 0), z_dir=(0, 0, 1))) as filete27_piece_1:
        with BuildLine():
            CenterArc((FILETE27_R, FILETE27_R), FILETE27_R, 180, 90)
            Line((0, FILETE27_R), (0, 0))
            Line((0, 0), (FILETE27_R, 0))
        make_face()
    extrude(amount=140, mode=Mode.SUBTRACT)

    # Esboço9 → Ressalto-extrusão11 (add)
    with BuildSketch(Plane.ZY.offset(86.965460526)):
        with Locations((85, 3.333333333)):
            Rectangle(ESBO_O9_W, ESBO_O9_H)
    extrude(amount=RESSALTO_EXTRUS_O11_DEPTH)

    # Esboço17 → Corte-extrusão10 (cut)
    with BuildSketch(Plane.XY.offset(90)):
        with Locations((-87.965460526, 18.833333333)):
            Rectangle(ESBO_O17_W, ESBO_O17_H)
        with Locations((-87.965460526, 3.333333333)):
            Rectangle(ESBO_O17_W, ESBO_O17_H_2)
        with Locations((-87.965460526, -12.166666667)):
            Rectangle(ESBO_O17_W, ESBO_O17_H)
    extrude(amount=-CORTE_EXTRUS_O10_DEPTH, mode=Mode.SUBTRACT)

    # Esboço18 → Ressalto-extrusão12 (add)
    with BuildSketch(Plane(origin=(73.034539474, 0, 0), x_dir=(0, 0, -1), z_dir=(1, 0, 0))):
        with Locations((-85, 3.333333333)):
            Rectangle(ESBO_O18_W, ESBO_O18_H)
    extrude(amount=RESSALTO_EXTRUS_O12_DEPTH)

    # Esboço19 → Corte-extrusão11 (cut)
    with BuildSketch(Plane.XY.offset(90)):
        with Locations((74.034539474, 18.833333333)):
            Rectangle(ESBO_O19_W, ESBO_O19_H)
        with Locations((74.034539474, 3.333333333)):
            Rectangle(ESBO_O19_W, ESBO_O19_H_2)
        with Locations((74.034539474, -12.166666667)):
            Rectangle(ESBO_O19_W, ESBO_O19_H)
    extrude(amount=-CORTE_EXTRUS_O11_DEPTH, mode=Mode.SUBTRACT)


solid = part.part
